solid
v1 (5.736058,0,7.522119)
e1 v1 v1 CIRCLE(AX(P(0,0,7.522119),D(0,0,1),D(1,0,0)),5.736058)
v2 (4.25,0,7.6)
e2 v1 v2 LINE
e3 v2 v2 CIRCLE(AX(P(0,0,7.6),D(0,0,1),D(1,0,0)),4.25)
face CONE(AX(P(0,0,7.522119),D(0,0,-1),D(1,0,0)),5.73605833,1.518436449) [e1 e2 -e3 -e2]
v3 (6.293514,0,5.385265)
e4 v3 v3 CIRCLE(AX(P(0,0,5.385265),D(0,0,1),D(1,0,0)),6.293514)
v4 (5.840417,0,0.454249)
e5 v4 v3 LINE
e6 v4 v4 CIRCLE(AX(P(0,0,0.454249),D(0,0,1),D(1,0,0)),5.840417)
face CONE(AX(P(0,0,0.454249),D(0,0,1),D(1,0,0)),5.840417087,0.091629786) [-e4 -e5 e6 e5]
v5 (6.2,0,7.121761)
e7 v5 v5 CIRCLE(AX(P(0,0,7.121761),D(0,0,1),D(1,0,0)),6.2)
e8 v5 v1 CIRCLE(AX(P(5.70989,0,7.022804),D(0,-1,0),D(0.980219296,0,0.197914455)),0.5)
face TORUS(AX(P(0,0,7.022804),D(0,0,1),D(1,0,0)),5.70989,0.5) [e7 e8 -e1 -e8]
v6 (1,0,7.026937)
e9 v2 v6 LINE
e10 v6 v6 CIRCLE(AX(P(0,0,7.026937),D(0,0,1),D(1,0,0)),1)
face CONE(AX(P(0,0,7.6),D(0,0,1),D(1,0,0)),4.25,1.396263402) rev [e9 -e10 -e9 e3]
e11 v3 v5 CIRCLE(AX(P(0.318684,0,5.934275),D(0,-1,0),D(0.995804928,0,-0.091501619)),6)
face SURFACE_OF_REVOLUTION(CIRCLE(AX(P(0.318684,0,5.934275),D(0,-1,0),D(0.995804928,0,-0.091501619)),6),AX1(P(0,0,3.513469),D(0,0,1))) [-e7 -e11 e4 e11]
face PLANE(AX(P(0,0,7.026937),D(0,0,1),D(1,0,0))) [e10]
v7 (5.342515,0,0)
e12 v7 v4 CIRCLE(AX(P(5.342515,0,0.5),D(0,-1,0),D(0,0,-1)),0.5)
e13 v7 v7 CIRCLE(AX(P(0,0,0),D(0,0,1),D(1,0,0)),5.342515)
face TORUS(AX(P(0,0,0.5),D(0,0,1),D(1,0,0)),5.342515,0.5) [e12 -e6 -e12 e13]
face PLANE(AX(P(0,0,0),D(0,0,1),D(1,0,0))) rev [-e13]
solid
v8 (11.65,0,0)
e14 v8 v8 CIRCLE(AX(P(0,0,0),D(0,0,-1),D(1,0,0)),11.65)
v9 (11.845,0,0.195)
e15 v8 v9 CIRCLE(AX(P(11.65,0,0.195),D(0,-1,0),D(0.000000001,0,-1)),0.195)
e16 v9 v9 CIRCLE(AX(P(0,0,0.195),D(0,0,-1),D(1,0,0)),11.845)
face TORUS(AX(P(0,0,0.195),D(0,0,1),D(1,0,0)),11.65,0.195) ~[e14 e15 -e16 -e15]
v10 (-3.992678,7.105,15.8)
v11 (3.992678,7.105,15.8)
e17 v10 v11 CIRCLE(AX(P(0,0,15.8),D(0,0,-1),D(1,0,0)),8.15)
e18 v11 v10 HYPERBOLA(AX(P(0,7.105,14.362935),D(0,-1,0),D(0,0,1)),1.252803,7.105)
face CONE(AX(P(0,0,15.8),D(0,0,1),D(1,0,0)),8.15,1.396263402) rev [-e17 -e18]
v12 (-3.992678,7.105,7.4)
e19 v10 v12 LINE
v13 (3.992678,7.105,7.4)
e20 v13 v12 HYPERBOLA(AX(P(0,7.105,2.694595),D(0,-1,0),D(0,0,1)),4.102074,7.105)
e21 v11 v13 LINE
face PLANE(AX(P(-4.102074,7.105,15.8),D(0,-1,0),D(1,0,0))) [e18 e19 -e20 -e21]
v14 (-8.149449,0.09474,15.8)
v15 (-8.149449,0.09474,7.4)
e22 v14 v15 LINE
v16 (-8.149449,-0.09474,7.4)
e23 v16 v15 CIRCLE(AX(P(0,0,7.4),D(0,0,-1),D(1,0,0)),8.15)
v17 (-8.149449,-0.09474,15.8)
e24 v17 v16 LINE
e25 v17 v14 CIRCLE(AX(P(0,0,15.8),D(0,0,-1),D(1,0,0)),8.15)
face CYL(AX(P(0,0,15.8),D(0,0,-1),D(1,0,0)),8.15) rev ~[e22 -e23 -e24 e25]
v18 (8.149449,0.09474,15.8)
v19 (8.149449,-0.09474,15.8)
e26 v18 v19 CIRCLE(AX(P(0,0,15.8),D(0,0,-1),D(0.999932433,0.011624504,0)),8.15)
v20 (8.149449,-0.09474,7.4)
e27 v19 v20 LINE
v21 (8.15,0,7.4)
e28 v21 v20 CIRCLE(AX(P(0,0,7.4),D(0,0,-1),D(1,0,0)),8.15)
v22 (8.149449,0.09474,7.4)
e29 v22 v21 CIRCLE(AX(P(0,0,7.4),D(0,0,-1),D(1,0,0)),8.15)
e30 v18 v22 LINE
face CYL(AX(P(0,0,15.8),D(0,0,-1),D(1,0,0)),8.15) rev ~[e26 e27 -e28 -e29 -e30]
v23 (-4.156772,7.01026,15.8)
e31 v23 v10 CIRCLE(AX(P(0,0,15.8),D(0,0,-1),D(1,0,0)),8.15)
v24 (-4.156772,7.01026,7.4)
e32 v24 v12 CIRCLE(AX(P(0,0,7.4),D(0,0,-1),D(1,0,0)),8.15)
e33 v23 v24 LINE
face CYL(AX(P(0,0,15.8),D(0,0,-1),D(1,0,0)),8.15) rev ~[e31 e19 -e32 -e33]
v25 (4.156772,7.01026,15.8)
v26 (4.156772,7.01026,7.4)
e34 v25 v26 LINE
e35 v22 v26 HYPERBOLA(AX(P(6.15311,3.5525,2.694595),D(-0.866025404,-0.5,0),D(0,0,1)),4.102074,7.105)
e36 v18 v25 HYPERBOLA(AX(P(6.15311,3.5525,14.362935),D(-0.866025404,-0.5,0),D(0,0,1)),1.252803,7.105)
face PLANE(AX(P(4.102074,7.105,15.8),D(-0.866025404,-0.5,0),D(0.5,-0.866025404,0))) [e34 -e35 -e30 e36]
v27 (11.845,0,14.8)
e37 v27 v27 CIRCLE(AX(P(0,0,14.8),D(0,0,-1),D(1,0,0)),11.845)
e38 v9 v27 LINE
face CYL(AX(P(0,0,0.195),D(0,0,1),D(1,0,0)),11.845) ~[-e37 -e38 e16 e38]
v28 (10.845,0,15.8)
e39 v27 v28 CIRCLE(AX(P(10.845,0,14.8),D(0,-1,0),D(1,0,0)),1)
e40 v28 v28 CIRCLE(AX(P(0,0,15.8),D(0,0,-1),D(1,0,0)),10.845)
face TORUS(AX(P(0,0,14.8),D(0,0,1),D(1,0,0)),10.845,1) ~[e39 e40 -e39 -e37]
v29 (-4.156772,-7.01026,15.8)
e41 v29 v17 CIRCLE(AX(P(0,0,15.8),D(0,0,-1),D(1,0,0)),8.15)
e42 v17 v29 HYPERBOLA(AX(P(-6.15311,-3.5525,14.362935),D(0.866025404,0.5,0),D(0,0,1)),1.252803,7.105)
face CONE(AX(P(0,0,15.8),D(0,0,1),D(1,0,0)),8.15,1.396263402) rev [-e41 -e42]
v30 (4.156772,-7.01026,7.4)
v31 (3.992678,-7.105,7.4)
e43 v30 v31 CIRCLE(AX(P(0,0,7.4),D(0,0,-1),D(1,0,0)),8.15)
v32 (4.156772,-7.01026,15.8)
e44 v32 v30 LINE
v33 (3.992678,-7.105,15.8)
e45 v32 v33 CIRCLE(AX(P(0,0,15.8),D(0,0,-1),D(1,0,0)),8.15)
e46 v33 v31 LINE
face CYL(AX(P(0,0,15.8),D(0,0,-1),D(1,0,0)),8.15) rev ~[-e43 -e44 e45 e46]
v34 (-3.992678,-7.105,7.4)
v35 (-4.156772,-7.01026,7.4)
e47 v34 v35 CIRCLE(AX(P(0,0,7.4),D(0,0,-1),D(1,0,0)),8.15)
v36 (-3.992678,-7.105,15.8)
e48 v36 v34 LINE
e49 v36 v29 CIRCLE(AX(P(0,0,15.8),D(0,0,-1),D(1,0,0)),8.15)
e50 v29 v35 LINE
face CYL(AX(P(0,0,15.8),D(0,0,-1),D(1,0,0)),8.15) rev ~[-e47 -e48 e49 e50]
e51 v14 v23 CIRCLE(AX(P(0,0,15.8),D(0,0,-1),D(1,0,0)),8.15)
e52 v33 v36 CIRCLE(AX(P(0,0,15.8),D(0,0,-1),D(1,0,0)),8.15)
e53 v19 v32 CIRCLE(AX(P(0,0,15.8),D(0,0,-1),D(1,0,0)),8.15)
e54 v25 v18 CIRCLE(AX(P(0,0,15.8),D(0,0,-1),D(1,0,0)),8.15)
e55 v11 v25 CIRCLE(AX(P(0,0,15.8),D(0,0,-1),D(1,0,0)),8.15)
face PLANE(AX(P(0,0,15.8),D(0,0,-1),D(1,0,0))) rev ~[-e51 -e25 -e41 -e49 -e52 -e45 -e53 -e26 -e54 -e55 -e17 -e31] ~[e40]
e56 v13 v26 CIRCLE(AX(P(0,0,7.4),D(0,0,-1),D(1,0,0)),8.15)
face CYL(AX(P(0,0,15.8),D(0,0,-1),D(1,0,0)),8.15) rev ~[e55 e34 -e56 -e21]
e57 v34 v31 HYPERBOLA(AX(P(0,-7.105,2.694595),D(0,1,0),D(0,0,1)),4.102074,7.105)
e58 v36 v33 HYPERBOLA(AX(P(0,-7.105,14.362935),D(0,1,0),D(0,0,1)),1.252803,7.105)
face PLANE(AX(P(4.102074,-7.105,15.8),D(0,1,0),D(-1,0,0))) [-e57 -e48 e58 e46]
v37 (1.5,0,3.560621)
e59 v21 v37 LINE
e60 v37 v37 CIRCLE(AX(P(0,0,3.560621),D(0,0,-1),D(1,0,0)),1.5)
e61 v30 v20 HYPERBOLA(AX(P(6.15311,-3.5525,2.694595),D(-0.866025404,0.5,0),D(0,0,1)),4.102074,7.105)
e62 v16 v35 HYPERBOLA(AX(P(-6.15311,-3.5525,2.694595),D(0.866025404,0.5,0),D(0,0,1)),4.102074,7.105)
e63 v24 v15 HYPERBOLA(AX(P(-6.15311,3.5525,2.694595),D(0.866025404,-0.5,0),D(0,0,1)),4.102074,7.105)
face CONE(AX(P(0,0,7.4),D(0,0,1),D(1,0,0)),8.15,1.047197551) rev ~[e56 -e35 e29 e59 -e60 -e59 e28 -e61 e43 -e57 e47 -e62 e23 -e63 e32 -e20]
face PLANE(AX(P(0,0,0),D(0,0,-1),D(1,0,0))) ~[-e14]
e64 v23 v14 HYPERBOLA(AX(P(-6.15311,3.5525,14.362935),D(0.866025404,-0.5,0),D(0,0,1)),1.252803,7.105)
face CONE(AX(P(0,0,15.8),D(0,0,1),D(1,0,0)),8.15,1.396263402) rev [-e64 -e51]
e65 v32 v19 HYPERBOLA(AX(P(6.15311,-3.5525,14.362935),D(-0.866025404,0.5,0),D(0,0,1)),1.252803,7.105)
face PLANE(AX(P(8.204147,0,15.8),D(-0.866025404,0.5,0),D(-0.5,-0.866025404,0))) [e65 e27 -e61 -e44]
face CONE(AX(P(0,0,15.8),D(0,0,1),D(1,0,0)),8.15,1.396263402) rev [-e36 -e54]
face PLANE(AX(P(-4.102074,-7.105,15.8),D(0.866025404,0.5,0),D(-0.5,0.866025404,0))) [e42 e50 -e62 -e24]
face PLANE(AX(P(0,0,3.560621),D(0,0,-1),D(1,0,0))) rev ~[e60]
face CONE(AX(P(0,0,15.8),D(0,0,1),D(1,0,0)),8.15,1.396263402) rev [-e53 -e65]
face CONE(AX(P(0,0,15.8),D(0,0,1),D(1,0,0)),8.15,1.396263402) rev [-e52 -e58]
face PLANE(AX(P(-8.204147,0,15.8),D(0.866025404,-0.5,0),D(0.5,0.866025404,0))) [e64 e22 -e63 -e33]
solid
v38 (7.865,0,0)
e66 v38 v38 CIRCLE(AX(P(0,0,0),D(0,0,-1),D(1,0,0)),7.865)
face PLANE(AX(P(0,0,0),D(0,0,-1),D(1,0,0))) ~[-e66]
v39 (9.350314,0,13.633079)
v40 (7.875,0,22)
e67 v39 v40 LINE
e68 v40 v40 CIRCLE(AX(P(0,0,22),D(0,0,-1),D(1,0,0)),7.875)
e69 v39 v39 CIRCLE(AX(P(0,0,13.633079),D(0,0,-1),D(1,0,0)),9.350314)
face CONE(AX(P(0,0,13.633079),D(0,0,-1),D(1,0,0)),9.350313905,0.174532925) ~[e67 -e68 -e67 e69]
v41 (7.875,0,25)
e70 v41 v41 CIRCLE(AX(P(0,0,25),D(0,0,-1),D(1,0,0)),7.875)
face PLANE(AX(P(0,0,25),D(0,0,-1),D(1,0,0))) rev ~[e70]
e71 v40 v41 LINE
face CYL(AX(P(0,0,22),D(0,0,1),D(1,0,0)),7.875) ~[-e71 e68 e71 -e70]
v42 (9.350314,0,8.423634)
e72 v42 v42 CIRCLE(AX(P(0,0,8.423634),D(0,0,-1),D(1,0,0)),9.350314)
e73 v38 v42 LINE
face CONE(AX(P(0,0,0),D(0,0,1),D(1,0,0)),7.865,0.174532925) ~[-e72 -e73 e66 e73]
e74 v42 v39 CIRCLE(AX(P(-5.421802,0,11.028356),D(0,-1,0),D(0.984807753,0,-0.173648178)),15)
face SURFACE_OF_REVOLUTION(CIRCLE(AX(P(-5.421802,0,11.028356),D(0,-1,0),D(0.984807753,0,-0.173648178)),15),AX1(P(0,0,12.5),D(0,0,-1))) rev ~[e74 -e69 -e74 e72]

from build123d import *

# Parameters (mm, degrees)
F2_R     = 10.845
F3_DEPTH = 15.8
F4_R     = 8.15
F5_DEPTH = 1
F5_TAPER = 80


# Not quite as in the source:
# - an extrude ends at something that could not be found from the text; its depth is read off the source's solid


with BuildPart() as f1:
    # F0 (on Front) → F1 (revolve)
    with BuildSketch(Plane.XZ):
        with BuildLine():
            Line((10.845, 15.8), (8.15, 15.8))
            Line((8.15, 15.8), (8.15, 7.4))
            Line((8.15, 7.4), (1.5, 3.5606207099))
            Line((1.5, 3.5606207099), (0, 3.5606207099))
            Line((0, 3.5606207099), (0, 0))
            Line((0, 0), (11.65, 0))
            ThreePointArc((11.65, 0), (11.7878858223, 0.0571141777), (11.845, 0.195))
            Line((11.845, 0.195), (11.845, 14.8))
            ThreePointArc((11.845, 14.8), (11.5521067812, 15.5071067812), (10.845, 15.8))
        make_face()
    revolve(axis=Axis((0, 0, 1.7803103549), (0, 0, -1)))

    # F2 (on face) → F3 (join, through all)
    with BuildSketch(Plane.XY.offset(15.8)):
        Circle(F2_R)
        Polygon((-8.2041473252, 0), (-4.1020736626, 7.105), (4.1020736626, 7.105), (8.2041473252, 0), (4.1020736626, -7.105), (-4.1020736626, -7.105), align=None, mode=Mode.SUBTRACT)
    extrude(amount=-F3_DEPTH)

    # F4 (on face) → F5 (cut)
    with BuildSketch(Plane.XY.offset(15.8)):
        Circle(F4_R)
    extrude(amount=-F5_DEPTH, taper=F5_TAPER, mode=Mode.SUBTRACT)


with BuildPart() as f7:
    # F6 (on Front) → F7 (revolve)
    with BuildSketch(Plane.XZ):
        with BuildLine():
            Line((7.875, 25), (0, 25))
            Line((0, 25), (0, 0))
            Line((0, 0), (7.865, 0))
            Line((7.865, 0), (9.3503139047, 8.4236337441))
            ThreePointArc((9.3503139047, 8.4236337441), (9.5781976095, 11.0283564091), (9.3503139047, 13.6330790741))
            Line((9.3503139047, 13.6330790741), (7.875, 22))
            Line((7.875, 22), (7.875, 25))
        make_face()
    revolve(axis=Axis((0, 0, 12.5), (0, 0, -1)))


with BuildPart() as f9:
    # F8 (on Front) → F9 (revolve)
    with BuildSketch(Plane.XZ):
        with BuildLine():
            Line((0, 7.0269373127), (0, 0))
            Line((0, 0), (5.3425146232, 0))
            ThreePointArc((5.3425146232, 0), (5.679504679, 0.1306252549), (5.840417087, 0.4542491907))
            Line((5.840417087, 0.4542491907), (6.2935137888, 5.3852650008))
            ThreePointArc((6.2935137888, 5.3852650008), (6.3100029903, 6.2569191501), (6.2, 7.1217614432))
            ThreePointArc((6.2, 7.1217614432), (6.0365510119, 7.4013445877), (5.7360583301, 7.522118983))
            Line((5.7360583301, 7.522118983), (4.25, 7.6))
            Line((4.25, 7.6), (1, 7.0269373127))
            Line((1, 7.0269373127), (0, 7.0269373127))
        make_face()
    revolve(axis=Axis((0, 0, 3.5134686563), (0, 0, 1)))


solid = Compound([f1.part, f7.part, f9.part])
